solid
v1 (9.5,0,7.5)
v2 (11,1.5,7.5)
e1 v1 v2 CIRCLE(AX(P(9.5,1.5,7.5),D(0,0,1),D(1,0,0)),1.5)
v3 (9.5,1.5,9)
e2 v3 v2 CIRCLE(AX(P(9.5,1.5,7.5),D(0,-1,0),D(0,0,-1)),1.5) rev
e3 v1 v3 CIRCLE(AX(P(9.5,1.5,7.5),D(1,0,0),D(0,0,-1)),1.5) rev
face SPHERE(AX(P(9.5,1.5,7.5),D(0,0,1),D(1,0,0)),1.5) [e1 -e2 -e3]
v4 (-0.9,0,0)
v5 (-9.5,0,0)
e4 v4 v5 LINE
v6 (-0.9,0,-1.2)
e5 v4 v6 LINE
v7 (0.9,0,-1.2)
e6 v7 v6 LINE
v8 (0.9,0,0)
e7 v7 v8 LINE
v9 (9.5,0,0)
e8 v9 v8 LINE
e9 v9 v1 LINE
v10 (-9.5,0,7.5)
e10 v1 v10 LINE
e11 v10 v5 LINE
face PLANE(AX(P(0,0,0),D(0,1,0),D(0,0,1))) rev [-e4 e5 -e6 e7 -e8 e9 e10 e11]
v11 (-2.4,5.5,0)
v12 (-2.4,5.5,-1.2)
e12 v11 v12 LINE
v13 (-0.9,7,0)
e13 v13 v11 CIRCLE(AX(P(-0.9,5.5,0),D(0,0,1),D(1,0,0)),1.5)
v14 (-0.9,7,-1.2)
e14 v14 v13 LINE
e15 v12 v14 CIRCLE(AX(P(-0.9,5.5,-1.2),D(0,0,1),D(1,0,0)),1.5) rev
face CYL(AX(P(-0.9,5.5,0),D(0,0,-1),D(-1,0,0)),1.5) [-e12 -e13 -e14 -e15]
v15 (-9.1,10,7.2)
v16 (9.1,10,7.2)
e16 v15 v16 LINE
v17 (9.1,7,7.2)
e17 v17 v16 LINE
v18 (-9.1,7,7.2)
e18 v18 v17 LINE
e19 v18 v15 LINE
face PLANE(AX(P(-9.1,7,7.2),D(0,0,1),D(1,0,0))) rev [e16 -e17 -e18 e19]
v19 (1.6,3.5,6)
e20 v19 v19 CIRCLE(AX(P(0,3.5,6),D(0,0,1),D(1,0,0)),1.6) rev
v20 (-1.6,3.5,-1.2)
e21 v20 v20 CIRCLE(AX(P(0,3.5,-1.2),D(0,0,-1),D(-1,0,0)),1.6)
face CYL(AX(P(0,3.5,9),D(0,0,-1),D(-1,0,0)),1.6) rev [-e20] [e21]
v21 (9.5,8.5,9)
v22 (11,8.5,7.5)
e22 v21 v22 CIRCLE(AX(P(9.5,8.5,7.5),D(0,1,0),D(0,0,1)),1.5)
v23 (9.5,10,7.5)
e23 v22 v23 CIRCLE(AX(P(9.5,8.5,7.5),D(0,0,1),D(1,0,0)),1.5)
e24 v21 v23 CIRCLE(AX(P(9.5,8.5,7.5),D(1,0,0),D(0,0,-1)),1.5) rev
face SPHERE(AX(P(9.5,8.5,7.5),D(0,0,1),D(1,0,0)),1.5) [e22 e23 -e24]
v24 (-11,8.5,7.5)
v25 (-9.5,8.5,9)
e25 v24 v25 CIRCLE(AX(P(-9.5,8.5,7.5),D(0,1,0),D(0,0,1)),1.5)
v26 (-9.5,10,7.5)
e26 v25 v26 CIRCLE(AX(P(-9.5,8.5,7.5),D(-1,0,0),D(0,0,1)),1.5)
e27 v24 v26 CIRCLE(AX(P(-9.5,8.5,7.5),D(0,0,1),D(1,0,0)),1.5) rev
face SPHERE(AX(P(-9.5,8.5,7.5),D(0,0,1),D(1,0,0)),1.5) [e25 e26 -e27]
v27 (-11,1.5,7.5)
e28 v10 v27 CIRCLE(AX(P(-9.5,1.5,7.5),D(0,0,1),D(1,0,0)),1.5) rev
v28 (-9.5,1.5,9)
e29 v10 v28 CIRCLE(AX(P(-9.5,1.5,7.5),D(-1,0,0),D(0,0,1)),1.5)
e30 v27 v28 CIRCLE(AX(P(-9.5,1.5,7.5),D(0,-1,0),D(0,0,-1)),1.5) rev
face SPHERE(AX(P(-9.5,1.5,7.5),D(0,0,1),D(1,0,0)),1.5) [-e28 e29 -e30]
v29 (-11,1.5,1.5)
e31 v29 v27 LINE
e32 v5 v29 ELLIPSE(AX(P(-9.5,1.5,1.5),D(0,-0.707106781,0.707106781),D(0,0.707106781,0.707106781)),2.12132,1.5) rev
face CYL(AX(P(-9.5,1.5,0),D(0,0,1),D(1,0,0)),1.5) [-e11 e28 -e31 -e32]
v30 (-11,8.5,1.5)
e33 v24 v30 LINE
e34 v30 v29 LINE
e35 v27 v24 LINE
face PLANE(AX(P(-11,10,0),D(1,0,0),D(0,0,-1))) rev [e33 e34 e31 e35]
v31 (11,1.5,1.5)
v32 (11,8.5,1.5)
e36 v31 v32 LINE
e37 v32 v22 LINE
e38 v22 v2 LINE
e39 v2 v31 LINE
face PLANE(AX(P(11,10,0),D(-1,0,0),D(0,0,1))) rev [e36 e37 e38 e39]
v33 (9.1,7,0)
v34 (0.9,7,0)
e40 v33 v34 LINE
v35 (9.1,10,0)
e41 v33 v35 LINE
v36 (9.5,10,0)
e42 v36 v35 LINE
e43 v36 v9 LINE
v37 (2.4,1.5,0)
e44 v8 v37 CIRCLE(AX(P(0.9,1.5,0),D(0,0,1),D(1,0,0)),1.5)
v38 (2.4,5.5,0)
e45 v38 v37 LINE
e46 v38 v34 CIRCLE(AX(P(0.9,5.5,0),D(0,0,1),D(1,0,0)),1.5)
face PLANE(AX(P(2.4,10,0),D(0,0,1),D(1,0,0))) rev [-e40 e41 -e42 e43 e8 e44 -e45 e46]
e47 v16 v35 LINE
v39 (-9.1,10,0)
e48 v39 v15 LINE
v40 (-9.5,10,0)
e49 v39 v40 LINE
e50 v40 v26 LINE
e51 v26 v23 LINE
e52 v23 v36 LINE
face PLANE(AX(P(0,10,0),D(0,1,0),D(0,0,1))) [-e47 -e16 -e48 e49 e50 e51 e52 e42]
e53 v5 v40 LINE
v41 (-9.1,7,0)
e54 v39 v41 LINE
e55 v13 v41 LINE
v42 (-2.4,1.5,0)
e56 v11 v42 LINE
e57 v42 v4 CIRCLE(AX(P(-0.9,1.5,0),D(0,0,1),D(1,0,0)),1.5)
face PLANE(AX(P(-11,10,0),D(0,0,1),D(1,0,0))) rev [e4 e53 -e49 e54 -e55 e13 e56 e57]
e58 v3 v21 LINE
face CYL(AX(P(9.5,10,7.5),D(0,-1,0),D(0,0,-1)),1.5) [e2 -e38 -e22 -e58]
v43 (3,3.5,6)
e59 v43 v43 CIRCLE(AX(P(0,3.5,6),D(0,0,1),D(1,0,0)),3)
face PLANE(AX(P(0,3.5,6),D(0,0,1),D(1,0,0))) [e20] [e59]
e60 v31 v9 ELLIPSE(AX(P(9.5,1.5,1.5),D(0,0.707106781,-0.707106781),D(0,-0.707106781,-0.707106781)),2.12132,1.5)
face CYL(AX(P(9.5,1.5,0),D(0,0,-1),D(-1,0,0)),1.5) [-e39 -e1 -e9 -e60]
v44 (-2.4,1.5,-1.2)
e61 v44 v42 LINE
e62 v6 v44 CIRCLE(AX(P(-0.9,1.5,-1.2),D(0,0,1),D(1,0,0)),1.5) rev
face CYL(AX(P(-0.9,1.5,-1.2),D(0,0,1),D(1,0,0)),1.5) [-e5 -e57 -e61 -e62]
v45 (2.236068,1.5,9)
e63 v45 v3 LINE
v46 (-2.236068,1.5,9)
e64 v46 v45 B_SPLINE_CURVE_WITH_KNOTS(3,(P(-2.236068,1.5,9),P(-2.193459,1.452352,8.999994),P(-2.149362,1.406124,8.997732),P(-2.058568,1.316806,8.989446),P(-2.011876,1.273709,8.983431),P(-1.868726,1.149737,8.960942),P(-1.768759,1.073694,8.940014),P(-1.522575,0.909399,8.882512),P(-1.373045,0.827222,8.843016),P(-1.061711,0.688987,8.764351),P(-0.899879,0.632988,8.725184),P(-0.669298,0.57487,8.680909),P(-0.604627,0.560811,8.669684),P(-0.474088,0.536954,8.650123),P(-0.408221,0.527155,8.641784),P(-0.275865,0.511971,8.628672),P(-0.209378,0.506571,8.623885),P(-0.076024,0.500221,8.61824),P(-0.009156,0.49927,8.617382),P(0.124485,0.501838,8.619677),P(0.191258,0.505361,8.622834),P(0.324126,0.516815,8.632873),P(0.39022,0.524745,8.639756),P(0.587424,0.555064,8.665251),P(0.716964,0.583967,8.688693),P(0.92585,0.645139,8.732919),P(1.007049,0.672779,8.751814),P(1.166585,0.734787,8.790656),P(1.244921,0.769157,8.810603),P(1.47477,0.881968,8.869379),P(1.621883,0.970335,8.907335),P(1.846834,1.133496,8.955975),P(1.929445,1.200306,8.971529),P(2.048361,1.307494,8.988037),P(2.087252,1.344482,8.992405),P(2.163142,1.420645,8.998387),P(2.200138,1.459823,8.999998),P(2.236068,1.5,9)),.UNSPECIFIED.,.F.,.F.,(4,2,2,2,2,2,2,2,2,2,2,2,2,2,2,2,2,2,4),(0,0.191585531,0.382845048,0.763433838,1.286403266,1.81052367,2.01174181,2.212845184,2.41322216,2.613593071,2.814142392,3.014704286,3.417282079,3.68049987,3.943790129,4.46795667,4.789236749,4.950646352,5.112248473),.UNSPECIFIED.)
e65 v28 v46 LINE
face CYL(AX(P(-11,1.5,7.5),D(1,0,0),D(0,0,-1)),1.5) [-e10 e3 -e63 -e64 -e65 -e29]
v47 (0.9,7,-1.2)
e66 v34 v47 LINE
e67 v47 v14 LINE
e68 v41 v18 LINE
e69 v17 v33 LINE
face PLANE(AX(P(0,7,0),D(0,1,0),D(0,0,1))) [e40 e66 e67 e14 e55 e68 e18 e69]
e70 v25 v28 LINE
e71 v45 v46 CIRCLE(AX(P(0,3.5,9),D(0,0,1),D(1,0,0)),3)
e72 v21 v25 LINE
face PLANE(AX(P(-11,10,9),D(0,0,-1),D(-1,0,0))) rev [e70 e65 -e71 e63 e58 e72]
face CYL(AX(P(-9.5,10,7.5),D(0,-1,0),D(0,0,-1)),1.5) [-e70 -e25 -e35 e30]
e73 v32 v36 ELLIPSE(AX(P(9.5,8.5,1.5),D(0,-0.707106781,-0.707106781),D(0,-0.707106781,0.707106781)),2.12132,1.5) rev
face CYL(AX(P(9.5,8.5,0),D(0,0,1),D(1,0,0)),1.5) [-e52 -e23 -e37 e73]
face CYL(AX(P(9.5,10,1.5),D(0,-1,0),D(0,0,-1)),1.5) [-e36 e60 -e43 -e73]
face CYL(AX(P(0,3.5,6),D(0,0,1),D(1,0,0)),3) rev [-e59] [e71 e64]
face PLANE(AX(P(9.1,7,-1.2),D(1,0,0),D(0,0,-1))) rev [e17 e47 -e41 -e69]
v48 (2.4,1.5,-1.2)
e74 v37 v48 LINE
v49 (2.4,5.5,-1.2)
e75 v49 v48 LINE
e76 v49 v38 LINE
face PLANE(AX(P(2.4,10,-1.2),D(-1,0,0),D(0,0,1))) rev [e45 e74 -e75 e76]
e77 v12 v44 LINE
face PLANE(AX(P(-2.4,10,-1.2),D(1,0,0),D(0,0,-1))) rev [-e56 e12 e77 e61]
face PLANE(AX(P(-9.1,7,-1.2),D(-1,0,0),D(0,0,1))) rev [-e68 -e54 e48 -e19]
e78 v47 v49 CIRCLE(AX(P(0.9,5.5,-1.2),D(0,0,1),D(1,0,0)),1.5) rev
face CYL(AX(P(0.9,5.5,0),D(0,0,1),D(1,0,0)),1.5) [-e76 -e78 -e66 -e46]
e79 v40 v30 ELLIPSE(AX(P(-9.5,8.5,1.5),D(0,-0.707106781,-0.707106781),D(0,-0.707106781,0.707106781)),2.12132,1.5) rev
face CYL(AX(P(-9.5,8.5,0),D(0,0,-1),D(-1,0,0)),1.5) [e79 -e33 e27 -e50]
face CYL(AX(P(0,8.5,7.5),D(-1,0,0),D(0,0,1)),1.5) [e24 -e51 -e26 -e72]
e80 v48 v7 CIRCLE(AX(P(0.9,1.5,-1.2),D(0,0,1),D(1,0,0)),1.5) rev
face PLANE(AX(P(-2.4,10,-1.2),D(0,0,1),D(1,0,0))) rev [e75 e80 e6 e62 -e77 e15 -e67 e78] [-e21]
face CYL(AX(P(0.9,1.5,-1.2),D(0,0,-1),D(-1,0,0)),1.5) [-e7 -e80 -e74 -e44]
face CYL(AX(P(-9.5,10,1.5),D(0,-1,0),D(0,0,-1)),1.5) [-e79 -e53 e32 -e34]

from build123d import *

# Parameters (mm, degrees)
BOSS_EXTRU_1_DEPTH      = 10
ESQUISSE2_W             = 18.2
ESQUISSE2_H             = 8.4
ENL_V_MAT_EXTRU_1_DEPTH = 3
ESQUISSE3_R             = 1.6
ENL_V_MAT_EXTRU_2_DEPTH = 19.028865744
ESQUISSE4_R             = 3
ENL_V_MAT_EXTRU_3_DEPTH = 3
CONG_1_R                = 1.5


with BuildPart() as part:
    # Esquisse1 → Boss.-Extru.1 (new body)
    with BuildSketch(Plane(origin=(0, 0, 0), x_dir=(1, 0, 0), z_dir=(0, 1, 0))):
        Polygon((2.4, 0), (11, 0), (11, -9), (-11, -9), (-11, 0), (-2.4, 0), (-2.4, 1.2), (2.4, 1.2), align=None)
    extrude(amount=BOSS_EXTRU_1_DEPTH)

    # Esquisse2 → Enlèv. mat.-Extru.1 (cut)
    with BuildSketch(Plane(origin=(0, 10, 0), x_dir=(1, 0, 0), z_dir=(0, 1, 0))):
        with Locations((0, -3)):
            Rectangle(ESQUISSE2_W, ESQUISSE2_H)
    extrude(amount=-ENL_V_MAT_EXTRU_1_DEPTH, mode=Mode.SUBTRACT)

    # Esquisse3 → Enlèv. mat.-Extru.2 (cut, through all)
    with BuildSketch(Plane(origin=(0, 0, -1.2), x_dir=(-1, 0, 0), z_dir=(0, 0, -1))):
        with Locations((0, 3.5)):
            Circle(ESQUISSE3_R)
    extrude(amount=-ENL_V_MAT_EXTRU_2_DEPTH, mode=Mode.SUBTRACT)

    # Esquisse4 → Enlèv. mat.-Extru.3 (cut)
    with BuildSketch(Plane.XY.offset(9)):
        with Locations((0, 3.5)):
            Circle(ESQUISSE4_R)
    extrude(amount=-ENL_V_MAT_EXTRU_3_DEPTH, mode=Mode.SUBTRACT)

    # Congé1
    # the kernel refuses this fillet: 1.5 mm, written as the material it takes off along each edge
    with BuildSketch(Plane(origin=(9.5, 8.5, 7.5), x_dir=(0, 1, 0), z_dir=(1, 0, 0))) as cong_1_piece_1_section:
        Polygon((0, 0), (CONG_1_R, 0), (CONG_1_R, CONG_1_R), (0, CONG_1_R), align=None)
    cong_1_piece_1 = extrude(amount=CONG_1_R, mode=Mode.PRIVATE)
    cong_1_piece_1 = cong_1_piece_1 - Plane(origin=(9.5, 8.5, 7.5), x_dir=(0, -0.7071067811865475, -0.7071067811865475), z_dir=(1, 0, 0)) * Sphere(CONG_1_R, mode=Mode.PRIVATE)
    add(cong_1_piece_1, mode=Mode.SUBTRACT)
    with BuildSketch(Plane(origin=(9.5, 1.5, 7.5), x_dir=(1, 0, 0), z_dir=(0, -1, 0))) as cong_1_piece_2_section:
        Polygon((0, 0), (CONG_1_R, 0), (CONG_1_R, CONG_1_R), (0, CONG_1_R), align=None)
    cong_1_piece_2 = extrude(amount=CONG_1_R, mode=Mode.PRIVATE)
    cong_1_piece_2 = cong_1_piece_2 - Plane(origin=(9.5, 1.5, 7.5), x_dir=(-0.7071067811865476, 0, -0.7071067811865475), z_dir=(0, -1, 0)) * Sphere(CONG_1_R, mode=Mode.PRIVATE)
    add(cong_1_piece_2, mode=Mode.SUBTRACT)
    with BuildSketch(Plane(origin=(-9.5, 1.5, 7.5), x_dir=(0, -1, 0), z_dir=(-1, 0, 0))) as cong_1_piece_3_section:
        Polygon((0, 0), (CONG_1_R, 0), (CONG_1_R, CONG_1_R), (0, CONG_1_R), align=None)
    cong_1_piece_3 = extrude(amount=CONG_1_R, mode=Mode.PRIVATE)
    cong_1_piece_3 = cong_1_piece_3 - Plane(origin=(-9.5, 1.5, 7.5), x_dir=(0, 0.7071067811865475, -0.7071067811865475), z_dir=(-1, 0, 0)) * Sphere(CONG_1_R, mode=Mode.PRIVATE)
    add(cong_1_piece_3, mode=Mode.SUBTRACT)
    with BuildSketch(Plane(origin=(-9.5, 8.5, 7.5), x_dir=(0, 1, 0), z_dir=(-1, 0, 0))) as cong_1_piece_4_section:
        Polygon((0, 0), (CONG_1_R, 0), (CONG_1_R, -CONG_1_R), (0, -CONG_1_R), align=None)
    cong_1_piece_4 = extrude(amount=CONG_1_R, mode=Mode.PRIVATE)
    cong_1_piece_4 = cong_1_piece_4 - Plane(origin=(-9.5, 8.5, 7.5), x_dir=(0, -0.7071067811865475, -0.7071067811865475), z_dir=(-1, 0, 0)) * Sphere(CONG_1_R, mode=Mode.PRIVATE)
    add(cong_1_piece_4, mode=Mode.SUBTRACT)
    with BuildSketch(Plane(origin=(11, 10, -3.75), x_dir=(0, -1, 0), z_dir=(0, 0, 1)), Plane(origin=(-11, 0, 7.5), x_dir=(1, 0, 0), z_dir=(0, 0, -1)), Plane(origin=(11, 0, -3.75), x_dir=(-1, 0, 0), z_dir=(0, 0, 1))) as cong_1_piece_5:
        with BuildLine():
            CenterArc((CONG_1_R, -CONG_1_R), CONG_1_R, 90, 90)
            Line((0, -CONG_1_R), (0, 0))
            Line((0, 0), (CONG_1_R, 0))
        make_face()
    extrude(amount=11.25, mode=Mode.SUBTRACT)
    with BuildSketch(Plane(origin=(9.5, 0, 9), x_dir=(0, 0, -1), z_dir=(-1, 0, 0))) as cong_1_piece_6:
        with BuildLine():
            CenterArc((CONG_1_R, -CONG_1_R), CONG_1_R, 90, 90)
            Line((0, -CONG_1_R), (0, 0))
            Line((0, 0), (CONG_1_R, 0))
        make_face()
    extrude(amount=19, mode=Mode.SUBTRACT)
    with BuildSketch(Plane(origin=(-11, -3.75, 0), x_dir=(0, 0, 1), z_dir=(0, 1, 0)), Plane(origin=(11, -3.75, 0), x_dir=(-1, 0, 0), z_dir=(0, 1, 0))) as cong_1_piece_7:
        with BuildLine():
            CenterArc((CONG_1_R, CONG_1_R), CONG_1_R, 180, 90)
            Line((0, CONG_1_R), (0, 0))
            Line((0, 0), (CONG_1_R, 0))
        make_face()
    extrude(amount=17.5, mode=Mode.SUBTRACT)
    with BuildSketch(Plane(origin=(11, 1.5, 9), x_dir=(0, 0, -1), z_dir=(0, 1, 0)), Plane(origin=(-11, 1.5, 9), x_dir=(1, 0, 0), z_dir=(0, 1, 0))) as cong_1_piece_8:
        with BuildLine():
            CenterArc((CONG_1_R, CONG_1_R), CONG_1_R, 180, 90)
            Line((0, CONG_1_R), (0, 0))
            Line((0, 0), (CONG_1_R, 0))
        make_face()
    extrude(amount=7, mode=Mode.SUBTRACT)
    with BuildSketch(Plane(origin=(2.4, 7, 0), x_dir=(-1, 0, 0), z_dir=(0, 0, -1)), Plane(origin=(-2.4, 7, -4.95), x_dir=(1, 0, 0), z_dir=(0, 0, 1)), Plane(origin=(-2.4, 0, 0), x_dir=(1, 0, 0), z_dir=(0, 0, -1)), Plane(origin=(2.4, 0, -4.95), x_dir=(-1, 0, 0), z_dir=(0, 0, 1))) as cong_1_piece_9:
        with BuildLine():
            CenterArc((CONG_1_R, -CONG_1_R), CONG_1_R, 90, 90)
            Line((0, -CONG_1_R), (0, 0))
            Line((0, 0), (CONG_1_R, 0))
        make_face()
    extrude(amount=4.95, mode=Mode.SUBTRACT)
    with BuildSketch(Plane(origin=(-11, 10, 7.5), x_dir=(1, 0, 0), z_dir=(0, 0, -1))) as cong_1_piece_10:
        with BuildLine():
            CenterArc((CONG_1_R, CONG_1_R), CONG_1_R, 180, 90)
            Line((0, CONG_1_R), (0, 0))
            Line((0, 0), (CONG_1_R, 0))
        make_face()
    extrude(amount=11.25, mode=Mode.SUBTRACT)
    with BuildSketch(Plane(origin=(9.5, 10, 9), x_dir=(0, 0, -1), z_dir=(-1, 0, 0))) as cong_1_piece_11:
        with BuildLine():
            CenterArc((CONG_1_R, CONG_1_R), CONG_1_R, 180, 90)
            Line((0, CONG_1_R), (0, 0))
            Line((0, 0), (CONG_1_R, 0))
        make_face()
    extrude(amount=19, mode=Mode.SUBTRACT)


solid = part.part
